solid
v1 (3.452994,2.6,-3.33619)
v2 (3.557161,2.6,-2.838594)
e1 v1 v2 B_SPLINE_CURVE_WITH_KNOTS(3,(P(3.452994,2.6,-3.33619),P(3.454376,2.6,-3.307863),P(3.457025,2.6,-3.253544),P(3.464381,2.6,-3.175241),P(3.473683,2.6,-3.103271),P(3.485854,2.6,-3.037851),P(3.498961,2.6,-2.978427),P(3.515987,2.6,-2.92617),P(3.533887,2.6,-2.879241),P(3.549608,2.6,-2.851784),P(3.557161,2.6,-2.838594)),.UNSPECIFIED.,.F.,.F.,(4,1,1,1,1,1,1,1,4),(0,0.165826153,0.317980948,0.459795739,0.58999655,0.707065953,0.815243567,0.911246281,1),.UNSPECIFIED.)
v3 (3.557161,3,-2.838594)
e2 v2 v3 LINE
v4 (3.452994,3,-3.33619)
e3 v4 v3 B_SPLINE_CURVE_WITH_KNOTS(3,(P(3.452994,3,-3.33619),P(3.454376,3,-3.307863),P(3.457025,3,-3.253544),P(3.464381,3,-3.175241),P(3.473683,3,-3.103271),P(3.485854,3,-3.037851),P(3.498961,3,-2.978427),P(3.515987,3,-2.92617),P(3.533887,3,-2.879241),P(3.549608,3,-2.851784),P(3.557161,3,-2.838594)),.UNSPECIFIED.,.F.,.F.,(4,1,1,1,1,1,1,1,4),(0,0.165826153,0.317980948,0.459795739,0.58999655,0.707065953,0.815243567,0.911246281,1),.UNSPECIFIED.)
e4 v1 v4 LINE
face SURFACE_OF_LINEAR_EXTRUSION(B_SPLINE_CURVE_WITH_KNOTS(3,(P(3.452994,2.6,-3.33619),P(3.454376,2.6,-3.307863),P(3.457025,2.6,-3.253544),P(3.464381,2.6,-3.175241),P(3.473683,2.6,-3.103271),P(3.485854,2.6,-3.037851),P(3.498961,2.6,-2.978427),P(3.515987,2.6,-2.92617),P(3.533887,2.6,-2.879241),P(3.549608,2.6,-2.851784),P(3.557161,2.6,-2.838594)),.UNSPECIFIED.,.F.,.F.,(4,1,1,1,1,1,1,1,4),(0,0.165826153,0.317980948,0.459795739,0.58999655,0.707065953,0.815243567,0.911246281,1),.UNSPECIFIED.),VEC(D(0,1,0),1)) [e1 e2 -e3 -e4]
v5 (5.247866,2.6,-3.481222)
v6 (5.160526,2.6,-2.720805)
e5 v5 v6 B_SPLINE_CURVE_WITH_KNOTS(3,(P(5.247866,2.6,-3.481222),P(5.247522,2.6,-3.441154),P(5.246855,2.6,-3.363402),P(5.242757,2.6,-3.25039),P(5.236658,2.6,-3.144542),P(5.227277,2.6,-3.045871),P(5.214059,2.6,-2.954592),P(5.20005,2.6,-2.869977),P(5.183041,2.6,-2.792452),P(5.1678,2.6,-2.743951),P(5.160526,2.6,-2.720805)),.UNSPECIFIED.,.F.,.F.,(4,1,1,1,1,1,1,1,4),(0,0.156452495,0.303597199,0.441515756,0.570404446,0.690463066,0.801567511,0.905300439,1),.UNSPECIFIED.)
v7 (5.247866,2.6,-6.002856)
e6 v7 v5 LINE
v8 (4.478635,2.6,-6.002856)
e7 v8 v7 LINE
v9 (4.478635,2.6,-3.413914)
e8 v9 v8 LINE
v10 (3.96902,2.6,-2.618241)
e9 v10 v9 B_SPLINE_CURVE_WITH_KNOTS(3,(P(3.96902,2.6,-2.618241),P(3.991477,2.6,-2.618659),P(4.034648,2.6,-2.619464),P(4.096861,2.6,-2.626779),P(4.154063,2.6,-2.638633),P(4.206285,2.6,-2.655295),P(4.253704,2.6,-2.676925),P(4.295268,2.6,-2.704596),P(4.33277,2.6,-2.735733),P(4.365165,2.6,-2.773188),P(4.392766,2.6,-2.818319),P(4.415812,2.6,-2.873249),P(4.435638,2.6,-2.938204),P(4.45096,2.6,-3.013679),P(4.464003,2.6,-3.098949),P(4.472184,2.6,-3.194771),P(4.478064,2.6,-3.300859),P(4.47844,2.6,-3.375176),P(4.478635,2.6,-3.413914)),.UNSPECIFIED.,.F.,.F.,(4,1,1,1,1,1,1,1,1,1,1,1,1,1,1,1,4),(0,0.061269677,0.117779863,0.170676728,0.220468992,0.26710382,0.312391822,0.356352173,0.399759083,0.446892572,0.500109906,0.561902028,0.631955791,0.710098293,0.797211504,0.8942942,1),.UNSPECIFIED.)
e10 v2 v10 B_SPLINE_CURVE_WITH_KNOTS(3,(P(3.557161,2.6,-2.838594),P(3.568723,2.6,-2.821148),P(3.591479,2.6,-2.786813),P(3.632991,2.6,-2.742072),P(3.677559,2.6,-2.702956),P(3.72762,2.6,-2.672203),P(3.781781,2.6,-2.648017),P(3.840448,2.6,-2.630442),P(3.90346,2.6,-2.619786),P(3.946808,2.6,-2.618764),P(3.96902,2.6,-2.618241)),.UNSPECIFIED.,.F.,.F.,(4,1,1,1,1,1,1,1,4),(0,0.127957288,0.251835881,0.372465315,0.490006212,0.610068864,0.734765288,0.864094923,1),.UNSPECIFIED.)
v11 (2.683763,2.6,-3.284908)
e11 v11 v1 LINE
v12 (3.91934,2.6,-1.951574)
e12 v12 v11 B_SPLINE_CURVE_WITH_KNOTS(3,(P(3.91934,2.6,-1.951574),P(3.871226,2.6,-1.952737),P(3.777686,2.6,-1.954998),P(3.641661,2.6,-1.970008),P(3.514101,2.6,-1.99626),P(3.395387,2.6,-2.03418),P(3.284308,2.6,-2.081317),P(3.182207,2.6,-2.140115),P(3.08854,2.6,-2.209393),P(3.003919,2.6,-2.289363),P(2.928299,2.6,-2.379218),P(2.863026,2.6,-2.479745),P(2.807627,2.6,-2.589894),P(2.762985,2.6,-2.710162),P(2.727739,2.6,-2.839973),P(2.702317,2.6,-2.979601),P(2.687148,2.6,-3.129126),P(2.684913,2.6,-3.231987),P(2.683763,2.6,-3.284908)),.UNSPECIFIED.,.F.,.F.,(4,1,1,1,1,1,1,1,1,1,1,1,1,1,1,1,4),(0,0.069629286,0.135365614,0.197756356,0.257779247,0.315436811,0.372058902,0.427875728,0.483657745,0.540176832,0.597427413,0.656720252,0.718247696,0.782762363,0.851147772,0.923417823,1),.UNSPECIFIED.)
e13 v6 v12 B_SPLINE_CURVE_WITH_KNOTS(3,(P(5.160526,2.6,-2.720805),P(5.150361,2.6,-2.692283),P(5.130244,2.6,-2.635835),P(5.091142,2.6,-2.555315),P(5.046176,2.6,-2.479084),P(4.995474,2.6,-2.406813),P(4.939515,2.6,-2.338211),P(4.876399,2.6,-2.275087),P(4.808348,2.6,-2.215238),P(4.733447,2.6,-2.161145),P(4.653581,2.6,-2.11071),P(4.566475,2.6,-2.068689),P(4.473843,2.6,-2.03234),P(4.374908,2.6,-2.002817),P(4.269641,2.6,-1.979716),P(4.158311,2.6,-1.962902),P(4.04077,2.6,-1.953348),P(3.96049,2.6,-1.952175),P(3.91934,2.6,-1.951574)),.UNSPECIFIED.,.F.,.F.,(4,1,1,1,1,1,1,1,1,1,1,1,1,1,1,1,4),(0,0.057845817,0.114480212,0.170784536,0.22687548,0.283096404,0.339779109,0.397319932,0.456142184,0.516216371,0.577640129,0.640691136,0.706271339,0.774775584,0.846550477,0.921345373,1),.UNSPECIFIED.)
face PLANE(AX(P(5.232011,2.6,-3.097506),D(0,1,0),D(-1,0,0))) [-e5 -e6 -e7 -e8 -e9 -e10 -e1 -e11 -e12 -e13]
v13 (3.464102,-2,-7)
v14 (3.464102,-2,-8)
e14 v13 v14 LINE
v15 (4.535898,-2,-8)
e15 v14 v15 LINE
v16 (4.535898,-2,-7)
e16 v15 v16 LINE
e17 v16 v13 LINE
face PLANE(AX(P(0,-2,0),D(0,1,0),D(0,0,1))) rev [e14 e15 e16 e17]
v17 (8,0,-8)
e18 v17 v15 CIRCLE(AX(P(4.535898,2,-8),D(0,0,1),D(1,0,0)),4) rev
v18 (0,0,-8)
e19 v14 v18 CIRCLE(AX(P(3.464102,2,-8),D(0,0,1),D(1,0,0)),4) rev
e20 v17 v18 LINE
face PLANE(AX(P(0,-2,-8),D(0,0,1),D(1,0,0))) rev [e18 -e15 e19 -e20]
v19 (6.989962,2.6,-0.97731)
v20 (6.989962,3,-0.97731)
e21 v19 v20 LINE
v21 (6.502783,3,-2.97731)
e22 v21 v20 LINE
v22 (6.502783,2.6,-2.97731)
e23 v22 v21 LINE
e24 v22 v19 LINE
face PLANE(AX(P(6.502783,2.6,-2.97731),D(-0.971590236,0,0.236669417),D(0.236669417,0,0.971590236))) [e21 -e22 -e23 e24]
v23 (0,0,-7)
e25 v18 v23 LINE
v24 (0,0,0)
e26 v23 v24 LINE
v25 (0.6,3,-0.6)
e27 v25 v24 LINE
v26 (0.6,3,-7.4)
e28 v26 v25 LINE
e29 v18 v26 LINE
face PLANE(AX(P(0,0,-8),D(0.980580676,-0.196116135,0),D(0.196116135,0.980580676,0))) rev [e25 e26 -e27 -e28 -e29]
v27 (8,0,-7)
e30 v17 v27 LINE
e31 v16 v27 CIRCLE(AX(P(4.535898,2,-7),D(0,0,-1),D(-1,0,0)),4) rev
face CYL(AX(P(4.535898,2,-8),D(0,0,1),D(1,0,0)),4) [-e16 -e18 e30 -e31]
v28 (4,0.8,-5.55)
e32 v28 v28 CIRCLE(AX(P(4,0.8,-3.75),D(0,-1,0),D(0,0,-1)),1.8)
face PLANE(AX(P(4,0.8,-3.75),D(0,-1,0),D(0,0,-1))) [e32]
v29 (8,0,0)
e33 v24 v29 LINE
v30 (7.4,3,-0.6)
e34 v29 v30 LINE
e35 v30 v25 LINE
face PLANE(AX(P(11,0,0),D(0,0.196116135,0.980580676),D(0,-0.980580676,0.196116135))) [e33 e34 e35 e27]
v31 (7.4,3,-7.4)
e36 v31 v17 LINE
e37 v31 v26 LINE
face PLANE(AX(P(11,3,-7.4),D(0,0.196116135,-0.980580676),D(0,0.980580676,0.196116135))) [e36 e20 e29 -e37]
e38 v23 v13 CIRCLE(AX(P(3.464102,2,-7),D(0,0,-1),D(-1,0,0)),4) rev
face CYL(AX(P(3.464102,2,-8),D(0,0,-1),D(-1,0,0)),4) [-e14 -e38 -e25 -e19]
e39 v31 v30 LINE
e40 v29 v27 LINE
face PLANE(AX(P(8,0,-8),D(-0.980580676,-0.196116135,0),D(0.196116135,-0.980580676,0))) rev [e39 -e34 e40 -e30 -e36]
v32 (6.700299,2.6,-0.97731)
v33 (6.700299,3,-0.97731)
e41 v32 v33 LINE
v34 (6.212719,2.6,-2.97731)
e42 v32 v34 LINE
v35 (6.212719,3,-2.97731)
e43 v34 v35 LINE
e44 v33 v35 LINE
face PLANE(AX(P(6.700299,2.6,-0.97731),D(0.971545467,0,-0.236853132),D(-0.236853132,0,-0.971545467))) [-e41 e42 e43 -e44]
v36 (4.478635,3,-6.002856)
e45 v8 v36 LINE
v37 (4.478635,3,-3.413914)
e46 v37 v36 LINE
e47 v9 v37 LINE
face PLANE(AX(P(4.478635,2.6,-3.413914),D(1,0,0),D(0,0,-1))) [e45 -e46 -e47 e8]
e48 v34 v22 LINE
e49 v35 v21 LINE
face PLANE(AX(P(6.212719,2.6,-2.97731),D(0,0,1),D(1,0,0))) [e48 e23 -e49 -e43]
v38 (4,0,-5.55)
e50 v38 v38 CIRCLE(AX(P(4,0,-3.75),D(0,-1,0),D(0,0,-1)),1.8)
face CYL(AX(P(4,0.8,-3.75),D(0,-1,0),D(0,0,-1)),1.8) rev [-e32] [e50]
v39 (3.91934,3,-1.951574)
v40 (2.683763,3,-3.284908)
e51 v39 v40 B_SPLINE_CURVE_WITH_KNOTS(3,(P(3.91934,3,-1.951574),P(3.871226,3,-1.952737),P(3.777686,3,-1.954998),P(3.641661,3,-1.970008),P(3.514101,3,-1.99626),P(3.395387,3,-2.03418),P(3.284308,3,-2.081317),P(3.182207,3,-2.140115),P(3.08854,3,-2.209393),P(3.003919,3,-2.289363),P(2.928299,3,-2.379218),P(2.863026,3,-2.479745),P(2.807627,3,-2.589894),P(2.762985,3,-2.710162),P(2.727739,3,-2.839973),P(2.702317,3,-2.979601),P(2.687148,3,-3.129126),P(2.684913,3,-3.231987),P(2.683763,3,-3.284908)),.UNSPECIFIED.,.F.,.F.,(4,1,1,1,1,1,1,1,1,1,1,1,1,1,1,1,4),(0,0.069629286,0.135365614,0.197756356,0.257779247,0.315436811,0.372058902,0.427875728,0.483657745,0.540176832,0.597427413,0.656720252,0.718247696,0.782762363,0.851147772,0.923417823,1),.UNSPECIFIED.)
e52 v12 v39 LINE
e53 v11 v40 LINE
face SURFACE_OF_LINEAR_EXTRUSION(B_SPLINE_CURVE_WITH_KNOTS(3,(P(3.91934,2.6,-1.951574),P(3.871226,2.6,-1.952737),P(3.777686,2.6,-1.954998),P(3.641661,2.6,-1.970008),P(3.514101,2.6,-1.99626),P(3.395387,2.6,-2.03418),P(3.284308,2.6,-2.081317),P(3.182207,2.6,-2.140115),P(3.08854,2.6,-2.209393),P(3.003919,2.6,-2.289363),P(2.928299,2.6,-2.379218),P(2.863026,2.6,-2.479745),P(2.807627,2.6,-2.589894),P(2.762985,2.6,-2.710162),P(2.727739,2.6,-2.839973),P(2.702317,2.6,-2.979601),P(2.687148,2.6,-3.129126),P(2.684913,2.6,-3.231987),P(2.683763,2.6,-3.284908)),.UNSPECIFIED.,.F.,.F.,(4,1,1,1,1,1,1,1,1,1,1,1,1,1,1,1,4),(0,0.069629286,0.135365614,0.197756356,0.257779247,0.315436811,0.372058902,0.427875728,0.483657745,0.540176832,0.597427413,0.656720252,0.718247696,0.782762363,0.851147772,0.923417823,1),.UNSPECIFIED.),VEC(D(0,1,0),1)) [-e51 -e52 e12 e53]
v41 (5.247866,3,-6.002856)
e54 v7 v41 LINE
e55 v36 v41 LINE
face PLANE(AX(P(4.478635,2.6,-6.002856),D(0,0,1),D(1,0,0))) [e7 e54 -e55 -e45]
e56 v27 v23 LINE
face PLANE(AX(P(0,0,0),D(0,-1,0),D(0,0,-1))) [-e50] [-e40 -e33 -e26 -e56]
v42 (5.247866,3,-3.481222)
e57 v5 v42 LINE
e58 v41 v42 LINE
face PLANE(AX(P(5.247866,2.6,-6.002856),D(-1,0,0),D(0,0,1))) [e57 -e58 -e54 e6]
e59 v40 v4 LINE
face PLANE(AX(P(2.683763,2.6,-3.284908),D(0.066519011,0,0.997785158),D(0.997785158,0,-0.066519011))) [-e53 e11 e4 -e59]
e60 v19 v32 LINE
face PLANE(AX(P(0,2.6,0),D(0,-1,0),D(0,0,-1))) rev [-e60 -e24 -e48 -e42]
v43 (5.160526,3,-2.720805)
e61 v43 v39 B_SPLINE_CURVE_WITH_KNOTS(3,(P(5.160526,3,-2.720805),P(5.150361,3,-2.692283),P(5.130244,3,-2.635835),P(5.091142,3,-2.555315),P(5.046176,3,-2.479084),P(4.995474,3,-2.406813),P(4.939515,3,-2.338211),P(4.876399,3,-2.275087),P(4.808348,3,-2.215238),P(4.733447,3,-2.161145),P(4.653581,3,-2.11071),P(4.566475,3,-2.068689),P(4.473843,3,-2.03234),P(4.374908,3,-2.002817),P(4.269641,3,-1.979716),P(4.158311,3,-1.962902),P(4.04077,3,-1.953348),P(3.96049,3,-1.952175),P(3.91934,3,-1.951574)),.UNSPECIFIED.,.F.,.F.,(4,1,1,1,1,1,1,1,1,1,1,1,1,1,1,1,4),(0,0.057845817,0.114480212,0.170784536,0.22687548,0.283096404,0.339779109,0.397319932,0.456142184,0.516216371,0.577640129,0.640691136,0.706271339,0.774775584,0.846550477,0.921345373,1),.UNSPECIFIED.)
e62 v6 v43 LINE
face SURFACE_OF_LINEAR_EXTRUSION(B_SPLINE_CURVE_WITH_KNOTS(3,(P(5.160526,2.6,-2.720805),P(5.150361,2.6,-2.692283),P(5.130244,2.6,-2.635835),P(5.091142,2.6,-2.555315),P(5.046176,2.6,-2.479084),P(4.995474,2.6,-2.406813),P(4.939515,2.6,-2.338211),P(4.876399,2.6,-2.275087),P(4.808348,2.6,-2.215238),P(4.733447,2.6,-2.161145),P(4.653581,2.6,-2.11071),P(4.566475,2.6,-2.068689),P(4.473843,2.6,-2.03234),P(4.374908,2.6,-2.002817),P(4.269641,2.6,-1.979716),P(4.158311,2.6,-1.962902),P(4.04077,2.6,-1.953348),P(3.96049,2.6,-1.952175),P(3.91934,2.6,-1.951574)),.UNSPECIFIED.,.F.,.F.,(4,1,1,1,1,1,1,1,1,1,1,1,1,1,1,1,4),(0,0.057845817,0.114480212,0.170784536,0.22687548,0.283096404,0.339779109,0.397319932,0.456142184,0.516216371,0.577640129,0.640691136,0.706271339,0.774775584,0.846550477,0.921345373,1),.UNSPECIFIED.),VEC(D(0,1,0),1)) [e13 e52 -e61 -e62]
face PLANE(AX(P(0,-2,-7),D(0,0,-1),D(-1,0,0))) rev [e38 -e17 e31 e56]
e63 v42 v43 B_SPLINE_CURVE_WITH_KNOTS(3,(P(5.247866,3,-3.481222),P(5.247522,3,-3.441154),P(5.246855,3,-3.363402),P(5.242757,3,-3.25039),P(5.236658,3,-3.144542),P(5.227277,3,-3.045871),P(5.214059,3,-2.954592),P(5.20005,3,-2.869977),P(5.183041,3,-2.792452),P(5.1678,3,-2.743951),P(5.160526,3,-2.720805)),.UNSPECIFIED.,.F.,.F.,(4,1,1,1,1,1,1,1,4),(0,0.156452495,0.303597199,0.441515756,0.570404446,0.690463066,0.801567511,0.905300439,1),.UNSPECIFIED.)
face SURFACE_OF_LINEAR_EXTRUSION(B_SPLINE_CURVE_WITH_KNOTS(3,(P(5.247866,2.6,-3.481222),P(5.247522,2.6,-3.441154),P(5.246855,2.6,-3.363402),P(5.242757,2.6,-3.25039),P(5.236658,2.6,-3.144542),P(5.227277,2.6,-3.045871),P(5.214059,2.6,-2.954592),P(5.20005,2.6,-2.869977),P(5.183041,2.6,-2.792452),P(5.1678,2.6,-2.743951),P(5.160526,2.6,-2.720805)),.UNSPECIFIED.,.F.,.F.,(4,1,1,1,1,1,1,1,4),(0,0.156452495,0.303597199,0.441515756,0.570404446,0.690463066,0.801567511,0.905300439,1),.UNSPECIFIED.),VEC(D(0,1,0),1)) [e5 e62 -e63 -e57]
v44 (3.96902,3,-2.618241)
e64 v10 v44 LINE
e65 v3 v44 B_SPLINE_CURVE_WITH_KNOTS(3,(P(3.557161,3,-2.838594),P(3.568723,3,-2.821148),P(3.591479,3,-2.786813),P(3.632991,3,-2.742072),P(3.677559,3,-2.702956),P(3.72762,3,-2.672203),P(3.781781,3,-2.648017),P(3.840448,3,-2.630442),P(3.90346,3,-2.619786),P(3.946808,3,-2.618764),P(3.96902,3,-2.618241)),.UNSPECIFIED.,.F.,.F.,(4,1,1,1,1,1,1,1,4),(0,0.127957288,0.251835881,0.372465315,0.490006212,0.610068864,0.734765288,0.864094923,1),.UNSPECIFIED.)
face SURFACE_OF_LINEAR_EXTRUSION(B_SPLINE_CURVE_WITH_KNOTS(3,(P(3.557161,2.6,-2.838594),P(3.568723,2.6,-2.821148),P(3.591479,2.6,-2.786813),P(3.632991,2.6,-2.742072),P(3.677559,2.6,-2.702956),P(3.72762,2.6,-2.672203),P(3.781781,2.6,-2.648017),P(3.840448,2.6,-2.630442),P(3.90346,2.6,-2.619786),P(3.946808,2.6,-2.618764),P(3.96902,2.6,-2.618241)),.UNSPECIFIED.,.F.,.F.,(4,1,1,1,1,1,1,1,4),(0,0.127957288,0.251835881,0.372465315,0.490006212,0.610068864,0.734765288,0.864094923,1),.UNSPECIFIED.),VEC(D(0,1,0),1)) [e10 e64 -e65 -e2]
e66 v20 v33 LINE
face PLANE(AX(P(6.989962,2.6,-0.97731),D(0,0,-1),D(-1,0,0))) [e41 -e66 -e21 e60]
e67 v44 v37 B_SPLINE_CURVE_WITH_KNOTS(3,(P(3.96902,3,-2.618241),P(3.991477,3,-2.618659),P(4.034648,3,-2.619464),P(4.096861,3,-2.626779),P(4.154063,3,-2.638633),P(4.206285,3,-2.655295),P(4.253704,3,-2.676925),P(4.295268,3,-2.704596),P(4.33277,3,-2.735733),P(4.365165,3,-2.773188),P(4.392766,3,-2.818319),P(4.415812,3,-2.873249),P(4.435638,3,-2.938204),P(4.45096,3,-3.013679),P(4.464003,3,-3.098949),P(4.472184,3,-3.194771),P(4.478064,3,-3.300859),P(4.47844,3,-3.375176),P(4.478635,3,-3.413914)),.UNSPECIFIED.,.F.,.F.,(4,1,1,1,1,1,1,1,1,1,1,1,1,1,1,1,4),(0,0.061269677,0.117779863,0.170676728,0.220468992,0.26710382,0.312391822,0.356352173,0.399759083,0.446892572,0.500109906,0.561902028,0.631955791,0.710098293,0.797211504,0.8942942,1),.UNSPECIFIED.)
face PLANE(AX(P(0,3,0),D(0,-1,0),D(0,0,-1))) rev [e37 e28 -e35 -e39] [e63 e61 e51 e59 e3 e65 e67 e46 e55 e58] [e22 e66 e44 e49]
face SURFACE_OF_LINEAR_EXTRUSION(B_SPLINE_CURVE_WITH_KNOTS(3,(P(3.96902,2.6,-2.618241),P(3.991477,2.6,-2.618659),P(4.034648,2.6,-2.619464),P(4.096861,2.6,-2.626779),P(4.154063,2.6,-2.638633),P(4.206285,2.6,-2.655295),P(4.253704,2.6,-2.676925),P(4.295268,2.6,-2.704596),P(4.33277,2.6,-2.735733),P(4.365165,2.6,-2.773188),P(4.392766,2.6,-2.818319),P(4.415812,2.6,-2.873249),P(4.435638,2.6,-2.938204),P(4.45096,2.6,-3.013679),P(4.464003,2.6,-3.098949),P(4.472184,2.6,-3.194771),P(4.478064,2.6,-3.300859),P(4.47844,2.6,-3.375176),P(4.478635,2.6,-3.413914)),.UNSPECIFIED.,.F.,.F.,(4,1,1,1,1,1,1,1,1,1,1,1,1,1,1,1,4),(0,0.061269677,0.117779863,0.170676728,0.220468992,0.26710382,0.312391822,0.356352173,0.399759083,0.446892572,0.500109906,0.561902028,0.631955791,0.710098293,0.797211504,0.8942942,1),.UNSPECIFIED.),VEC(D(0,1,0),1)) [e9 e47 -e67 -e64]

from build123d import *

# Parameters (mm, degrees)
SKETCH1_W               = 8
SKETCH1_H               = 8
BOSS_EXTRUDE1_DEPTH     = 3
CUT_EXTRUDE1_DEPTH      = 12.704699911
CUT_EXTRUDE1_DEPTH_BACK = 12.704699911
CUT_EXTRUDE2_DEPTH      = 11
SKETCH4_R               = 1.8
CUT_EXTRUDE3_DEPTH      = 0.8
SKETCH5_W               = 8
SKETCH5_H               = 1
BOSS_EXTRUDE2_DEPTH     = 2
FILLET1_R               = 4
CUT_EXTRUDE4_DEPTH      = 0.4
CUT_EXTRUDE5_DEPTH      = 0.4


with BuildPart() as part:
    # Sketch1 → Boss-Extrude1 (new body)
    with BuildSketch(Plane(origin=(0, 0, 0), x_dir=(1, 0, 0), z_dir=(0, 1, 0))):
        with Locations((4, 4)):
            Rectangle(SKETCH1_W, SKETCH1_H)
    extrude(amount=BOSS_EXTRUDE1_DEPTH)

    # Sketch2 → Cut-Extrude1 (cut, two sides: drawn at the far end of the back side and taken through both)
    with BuildSketch(Plane.XY.offset(-CUT_EXTRUDE1_DEPTH_BACK)):
        Polygon((0, 0), (0.6, 3), (0, 3), align=None)
        Polygon((8, 0), (7.4, 3), (8, 3), align=None)
    extrude(amount=CUT_EXTRUDE1_DEPTH + CUT_EXTRUDE1_DEPTH_BACK, mode=Mode.SUBTRACT)

    # Sketch3 → Cut-Extrude2 (cut)
    with BuildSketch(Plane(origin=(0, 0, 0), x_dir=(0, 0, -1), z_dir=(1, 0, 0))):
        Polygon((0, 0), (0.6, 3), (0, 3), align=None)
        Polygon((8, 3), (7.4, 3), (8, 0), align=None)
    extrude(amount=CUT_EXTRUDE2_DEPTH, mode=Mode.SUBTRACT)

    # Sketch4 → Cut-Extrude3 (cut)
    with BuildSketch(Plane.XZ):
        with Locations(Location((4, -3.75, 0), (0, 0, 270))):
            Circle(SKETCH4_R)
    extrude(amount=-CUT_EXTRUDE3_DEPTH, mode=Mode.SUBTRACT)

    # Sketch5 → Boss-Extrude2 (add)
    with BuildSketch(Plane.XZ):
        with Locations((4, -7.5)):
            Rectangle(SKETCH5_W, SKETCH5_H)
    extrude(amount=BOSS_EXTRUDE2_DEPTH)

    # Fillet1
    # the kernel refuses this fillet: 4 mm, written as the material it takes off along each edge
    with BuildSketch(Plane(origin=(8, -2, -16.660254038), x_dir=(0, 1, 0), z_dir=(0, 0, 1)), Plane(origin=(0, -2, 1.660254038), x_dir=(0, 1, 0), z_dir=(0, 0, -1))) as fillet1_piece_1:
        with BuildLine():
            CenterArc((4, 3.464101615), FILLET1_R, 180, 60)
            Line((0, 3.464101615), (-0.08, 3.464101615))
            Line((-0.08, 3.464101615), (-0.08, 0))
            Line((-0.08, 0), (0, -0.08))
            ThreePointArc((0, -0.08), (1, -0.08), (1.96, -0.069282032))
            Line((1.96, -0.069282032), (2, 0))
        make_face()
    extrude(amount=18.320508076, mode=Mode.SUBTRACT)

    # Sketch6 → Cut-Extrude4 (cut)
    with BuildSketch(Plane(origin=(0, 3, 0), x_dir=(1, 0, 0), z_dir=(0, 1, 0))):
        with BuildLine():
            Line((4.478635236, 6.002856352), (5.247866005, 6.002856352))
            Line((5.247866005, 6.002856352), (5.247866005, 3.481221736))
            add(Edge.make_bspline(
                [(5.247866005, 3.481221736), (5.247522255, 3.441153869), (5.246855206, 3.363401883), (5.242756502, 3.250390465), (5.236658321, 3.14454193), (5.227277222, 3.045871471), (5.21405872, 2.954592388), (5.200049867, 2.869976575), (5.183041427, 2.792451692), (5.167800036, 2.743951306), (5.160526262, 2.72080507)],
                knots=[0, 0, 0, 0, 1.251619961, 2.428777588, 3.532126049, 4.56323557, 5.523704531, 6.412540087, 7.242403515, 8, 8, 8, 8], degree=3))
            add(Edge.make_bspline(
                [(5.160526262, 2.72080507), (5.150361081, 2.692282601), (5.130243602, 2.635834988), (5.091141653, 2.555314881), (5.046176431, 2.479084315), (4.995474484, 2.406812938), (4.939514717, 2.338210987), (4.876399077, 2.275086649), (4.8083478, 2.215238098), (4.733446681, 2.161145289), (4.653580791, 2.110709794), (4.566475051, 2.068688963), (4.473843299, 2.032340387), (4.374908104, 2.002816628), (4.269640778, 1.979716073), (4.158311001, 1.962901894), (4.040770466, 1.95334773), (3.960490164, 1.952175274), (3.919340364, 1.9515743)],
                knots=[0, 0, 0, 0, 0.925533072, 1.831683394, 2.73255258, 3.630007683, 4.529542467, 5.436465751, 6.357118906, 7.298274949, 8.259461937, 9.242242071, 10.251058183, 11.300341426, 12.396409345, 13.544807631, 14.74152597, 16, 16, 16, 16], degree=3))
            add(Edge.make_bspline(
                [(3.919340364, 1.9515743), (3.871225528, 1.952737211), (3.777685944, 1.954998015), (3.641661475, 1.97000769), (3.514100564, 1.996260242), (3.395387048, 2.034179675), (3.284307874, 2.08131717), (3.182206561, 2.140114726), (3.088540477, 2.209392701), (3.003918711, 2.289363431), (2.928299433, 2.379218215), (2.863026475, 2.479745415), (2.80762712, 2.589893743), (2.762984692, 2.710161506), (2.727739397, 2.839972913), (2.702317462, 2.979601288), (2.687147894, 3.129126134), (2.684913172, 3.2319872), (2.683763441, 3.284907634)],
                knots=[0, 0, 0, 0, 1.114068574, 2.165849827, 3.164101702, 4.124467949, 5.046988974, 5.952942428, 6.846011651, 7.738523925, 8.642829306, 9.558838605, 10.50752403, 11.491963144, 12.524197802, 13.618364352, 14.774685164, 16, 16, 16, 16], degree=3))
            Line((2.683763441, 3.284907634), (3.45299421, 3.336189685))
            add(Edge.make_bspline(
                [(3.45299421, 3.336189685), (3.454375767, 3.307862598), (3.45702498, 3.25354382), (3.464380935, 3.175240866), (3.473682687, 3.103271277), (3.485853837, 3.037851064), (3.498960823, 2.978427444), (3.515987002, 2.926169857), (3.533886556, 2.879240769), (3.549608387, 2.851783511), (3.557160877, 2.838593531)],
                knots=[0, 0, 0, 0, 1.326609226, 2.543847584, 3.678365909, 4.719972403, 5.656527627, 6.521948534, 7.28997025, 8, 8, 8, 8], degree=3))
            add(Edge.make_bspline(
                [(3.557160877, 2.838593531), (3.56872297, 2.821148121), (3.59147861, 2.786813382), (3.632990929, 2.742071605), (3.677558537, 2.702955843), (3.727619554, 2.672203009), (3.781780527, 2.648016829), (3.840448037, 2.63044225), (3.903460331, 2.619785853), (3.946808463, 2.61876437), (3.969019851, 2.618240967)],
                knots=[0, 0, 0, 0, 1.023658308, 2.014687051, 2.979722519, 3.920049697, 4.880550909, 5.878122304, 6.912759386, 8, 8, 8, 8], degree=3))
            add(Edge.make_bspline(
                [(3.969019851, 2.618240967), (3.991477248, 2.618659453), (4.034647527, 2.619463917), (4.09686091, 2.626779219), (4.154063033, 2.638632824), (4.206285054, 2.655294856), (4.253703868, 2.676924623), (4.295268393, 2.704596166), (4.33276969, 2.735732915), (4.36516489, 2.773188264), (4.392766236, 2.818318957), (4.415812105, 2.873248962), (4.43563784, 2.938204221), (4.450960178, 3.01367855), (4.464002509, 3.098949399), (4.472183692, 3.194770716), (4.478064386, 3.300859295), (4.478439634, 3.37517575), (4.478635236, 3.413914044)],
                knots=[0, 0, 0, 0, 0.980314827, 1.884477813, 2.730827652, 3.527503874, 4.27366112, 4.998269146, 5.70163477, 6.396145331, 7.150281155, 8.001758491, 8.990432449, 10.111292654, 11.361572691, 12.75538406, 14.308707205, 16, 16, 16, 16], degree=3))
            Line((4.478635236, 3.413914044), (4.478635236, 6.002856352))
        make_face()
    extrude(amount=-CUT_EXTRUDE4_DEPTH, mode=Mode.SUBTRACT)

    # Sketch7 → Cut-Extrude5 (cut)
    with BuildSketch(Plane(origin=(0, 3, 0), x_dir=(1, 0, 0), z_dir=(0, 1, 0))):
        Polygon((6.21271865, 2.977310221), (6.502782752, 2.977310221), (6.989962239, 0.977310221), (6.700298778, 0.977310221), align=None)
    extrude(amount=-CUT_EXTRUDE5_DEPTH, mode=Mode.SUBTRACT)


solid = part.part
